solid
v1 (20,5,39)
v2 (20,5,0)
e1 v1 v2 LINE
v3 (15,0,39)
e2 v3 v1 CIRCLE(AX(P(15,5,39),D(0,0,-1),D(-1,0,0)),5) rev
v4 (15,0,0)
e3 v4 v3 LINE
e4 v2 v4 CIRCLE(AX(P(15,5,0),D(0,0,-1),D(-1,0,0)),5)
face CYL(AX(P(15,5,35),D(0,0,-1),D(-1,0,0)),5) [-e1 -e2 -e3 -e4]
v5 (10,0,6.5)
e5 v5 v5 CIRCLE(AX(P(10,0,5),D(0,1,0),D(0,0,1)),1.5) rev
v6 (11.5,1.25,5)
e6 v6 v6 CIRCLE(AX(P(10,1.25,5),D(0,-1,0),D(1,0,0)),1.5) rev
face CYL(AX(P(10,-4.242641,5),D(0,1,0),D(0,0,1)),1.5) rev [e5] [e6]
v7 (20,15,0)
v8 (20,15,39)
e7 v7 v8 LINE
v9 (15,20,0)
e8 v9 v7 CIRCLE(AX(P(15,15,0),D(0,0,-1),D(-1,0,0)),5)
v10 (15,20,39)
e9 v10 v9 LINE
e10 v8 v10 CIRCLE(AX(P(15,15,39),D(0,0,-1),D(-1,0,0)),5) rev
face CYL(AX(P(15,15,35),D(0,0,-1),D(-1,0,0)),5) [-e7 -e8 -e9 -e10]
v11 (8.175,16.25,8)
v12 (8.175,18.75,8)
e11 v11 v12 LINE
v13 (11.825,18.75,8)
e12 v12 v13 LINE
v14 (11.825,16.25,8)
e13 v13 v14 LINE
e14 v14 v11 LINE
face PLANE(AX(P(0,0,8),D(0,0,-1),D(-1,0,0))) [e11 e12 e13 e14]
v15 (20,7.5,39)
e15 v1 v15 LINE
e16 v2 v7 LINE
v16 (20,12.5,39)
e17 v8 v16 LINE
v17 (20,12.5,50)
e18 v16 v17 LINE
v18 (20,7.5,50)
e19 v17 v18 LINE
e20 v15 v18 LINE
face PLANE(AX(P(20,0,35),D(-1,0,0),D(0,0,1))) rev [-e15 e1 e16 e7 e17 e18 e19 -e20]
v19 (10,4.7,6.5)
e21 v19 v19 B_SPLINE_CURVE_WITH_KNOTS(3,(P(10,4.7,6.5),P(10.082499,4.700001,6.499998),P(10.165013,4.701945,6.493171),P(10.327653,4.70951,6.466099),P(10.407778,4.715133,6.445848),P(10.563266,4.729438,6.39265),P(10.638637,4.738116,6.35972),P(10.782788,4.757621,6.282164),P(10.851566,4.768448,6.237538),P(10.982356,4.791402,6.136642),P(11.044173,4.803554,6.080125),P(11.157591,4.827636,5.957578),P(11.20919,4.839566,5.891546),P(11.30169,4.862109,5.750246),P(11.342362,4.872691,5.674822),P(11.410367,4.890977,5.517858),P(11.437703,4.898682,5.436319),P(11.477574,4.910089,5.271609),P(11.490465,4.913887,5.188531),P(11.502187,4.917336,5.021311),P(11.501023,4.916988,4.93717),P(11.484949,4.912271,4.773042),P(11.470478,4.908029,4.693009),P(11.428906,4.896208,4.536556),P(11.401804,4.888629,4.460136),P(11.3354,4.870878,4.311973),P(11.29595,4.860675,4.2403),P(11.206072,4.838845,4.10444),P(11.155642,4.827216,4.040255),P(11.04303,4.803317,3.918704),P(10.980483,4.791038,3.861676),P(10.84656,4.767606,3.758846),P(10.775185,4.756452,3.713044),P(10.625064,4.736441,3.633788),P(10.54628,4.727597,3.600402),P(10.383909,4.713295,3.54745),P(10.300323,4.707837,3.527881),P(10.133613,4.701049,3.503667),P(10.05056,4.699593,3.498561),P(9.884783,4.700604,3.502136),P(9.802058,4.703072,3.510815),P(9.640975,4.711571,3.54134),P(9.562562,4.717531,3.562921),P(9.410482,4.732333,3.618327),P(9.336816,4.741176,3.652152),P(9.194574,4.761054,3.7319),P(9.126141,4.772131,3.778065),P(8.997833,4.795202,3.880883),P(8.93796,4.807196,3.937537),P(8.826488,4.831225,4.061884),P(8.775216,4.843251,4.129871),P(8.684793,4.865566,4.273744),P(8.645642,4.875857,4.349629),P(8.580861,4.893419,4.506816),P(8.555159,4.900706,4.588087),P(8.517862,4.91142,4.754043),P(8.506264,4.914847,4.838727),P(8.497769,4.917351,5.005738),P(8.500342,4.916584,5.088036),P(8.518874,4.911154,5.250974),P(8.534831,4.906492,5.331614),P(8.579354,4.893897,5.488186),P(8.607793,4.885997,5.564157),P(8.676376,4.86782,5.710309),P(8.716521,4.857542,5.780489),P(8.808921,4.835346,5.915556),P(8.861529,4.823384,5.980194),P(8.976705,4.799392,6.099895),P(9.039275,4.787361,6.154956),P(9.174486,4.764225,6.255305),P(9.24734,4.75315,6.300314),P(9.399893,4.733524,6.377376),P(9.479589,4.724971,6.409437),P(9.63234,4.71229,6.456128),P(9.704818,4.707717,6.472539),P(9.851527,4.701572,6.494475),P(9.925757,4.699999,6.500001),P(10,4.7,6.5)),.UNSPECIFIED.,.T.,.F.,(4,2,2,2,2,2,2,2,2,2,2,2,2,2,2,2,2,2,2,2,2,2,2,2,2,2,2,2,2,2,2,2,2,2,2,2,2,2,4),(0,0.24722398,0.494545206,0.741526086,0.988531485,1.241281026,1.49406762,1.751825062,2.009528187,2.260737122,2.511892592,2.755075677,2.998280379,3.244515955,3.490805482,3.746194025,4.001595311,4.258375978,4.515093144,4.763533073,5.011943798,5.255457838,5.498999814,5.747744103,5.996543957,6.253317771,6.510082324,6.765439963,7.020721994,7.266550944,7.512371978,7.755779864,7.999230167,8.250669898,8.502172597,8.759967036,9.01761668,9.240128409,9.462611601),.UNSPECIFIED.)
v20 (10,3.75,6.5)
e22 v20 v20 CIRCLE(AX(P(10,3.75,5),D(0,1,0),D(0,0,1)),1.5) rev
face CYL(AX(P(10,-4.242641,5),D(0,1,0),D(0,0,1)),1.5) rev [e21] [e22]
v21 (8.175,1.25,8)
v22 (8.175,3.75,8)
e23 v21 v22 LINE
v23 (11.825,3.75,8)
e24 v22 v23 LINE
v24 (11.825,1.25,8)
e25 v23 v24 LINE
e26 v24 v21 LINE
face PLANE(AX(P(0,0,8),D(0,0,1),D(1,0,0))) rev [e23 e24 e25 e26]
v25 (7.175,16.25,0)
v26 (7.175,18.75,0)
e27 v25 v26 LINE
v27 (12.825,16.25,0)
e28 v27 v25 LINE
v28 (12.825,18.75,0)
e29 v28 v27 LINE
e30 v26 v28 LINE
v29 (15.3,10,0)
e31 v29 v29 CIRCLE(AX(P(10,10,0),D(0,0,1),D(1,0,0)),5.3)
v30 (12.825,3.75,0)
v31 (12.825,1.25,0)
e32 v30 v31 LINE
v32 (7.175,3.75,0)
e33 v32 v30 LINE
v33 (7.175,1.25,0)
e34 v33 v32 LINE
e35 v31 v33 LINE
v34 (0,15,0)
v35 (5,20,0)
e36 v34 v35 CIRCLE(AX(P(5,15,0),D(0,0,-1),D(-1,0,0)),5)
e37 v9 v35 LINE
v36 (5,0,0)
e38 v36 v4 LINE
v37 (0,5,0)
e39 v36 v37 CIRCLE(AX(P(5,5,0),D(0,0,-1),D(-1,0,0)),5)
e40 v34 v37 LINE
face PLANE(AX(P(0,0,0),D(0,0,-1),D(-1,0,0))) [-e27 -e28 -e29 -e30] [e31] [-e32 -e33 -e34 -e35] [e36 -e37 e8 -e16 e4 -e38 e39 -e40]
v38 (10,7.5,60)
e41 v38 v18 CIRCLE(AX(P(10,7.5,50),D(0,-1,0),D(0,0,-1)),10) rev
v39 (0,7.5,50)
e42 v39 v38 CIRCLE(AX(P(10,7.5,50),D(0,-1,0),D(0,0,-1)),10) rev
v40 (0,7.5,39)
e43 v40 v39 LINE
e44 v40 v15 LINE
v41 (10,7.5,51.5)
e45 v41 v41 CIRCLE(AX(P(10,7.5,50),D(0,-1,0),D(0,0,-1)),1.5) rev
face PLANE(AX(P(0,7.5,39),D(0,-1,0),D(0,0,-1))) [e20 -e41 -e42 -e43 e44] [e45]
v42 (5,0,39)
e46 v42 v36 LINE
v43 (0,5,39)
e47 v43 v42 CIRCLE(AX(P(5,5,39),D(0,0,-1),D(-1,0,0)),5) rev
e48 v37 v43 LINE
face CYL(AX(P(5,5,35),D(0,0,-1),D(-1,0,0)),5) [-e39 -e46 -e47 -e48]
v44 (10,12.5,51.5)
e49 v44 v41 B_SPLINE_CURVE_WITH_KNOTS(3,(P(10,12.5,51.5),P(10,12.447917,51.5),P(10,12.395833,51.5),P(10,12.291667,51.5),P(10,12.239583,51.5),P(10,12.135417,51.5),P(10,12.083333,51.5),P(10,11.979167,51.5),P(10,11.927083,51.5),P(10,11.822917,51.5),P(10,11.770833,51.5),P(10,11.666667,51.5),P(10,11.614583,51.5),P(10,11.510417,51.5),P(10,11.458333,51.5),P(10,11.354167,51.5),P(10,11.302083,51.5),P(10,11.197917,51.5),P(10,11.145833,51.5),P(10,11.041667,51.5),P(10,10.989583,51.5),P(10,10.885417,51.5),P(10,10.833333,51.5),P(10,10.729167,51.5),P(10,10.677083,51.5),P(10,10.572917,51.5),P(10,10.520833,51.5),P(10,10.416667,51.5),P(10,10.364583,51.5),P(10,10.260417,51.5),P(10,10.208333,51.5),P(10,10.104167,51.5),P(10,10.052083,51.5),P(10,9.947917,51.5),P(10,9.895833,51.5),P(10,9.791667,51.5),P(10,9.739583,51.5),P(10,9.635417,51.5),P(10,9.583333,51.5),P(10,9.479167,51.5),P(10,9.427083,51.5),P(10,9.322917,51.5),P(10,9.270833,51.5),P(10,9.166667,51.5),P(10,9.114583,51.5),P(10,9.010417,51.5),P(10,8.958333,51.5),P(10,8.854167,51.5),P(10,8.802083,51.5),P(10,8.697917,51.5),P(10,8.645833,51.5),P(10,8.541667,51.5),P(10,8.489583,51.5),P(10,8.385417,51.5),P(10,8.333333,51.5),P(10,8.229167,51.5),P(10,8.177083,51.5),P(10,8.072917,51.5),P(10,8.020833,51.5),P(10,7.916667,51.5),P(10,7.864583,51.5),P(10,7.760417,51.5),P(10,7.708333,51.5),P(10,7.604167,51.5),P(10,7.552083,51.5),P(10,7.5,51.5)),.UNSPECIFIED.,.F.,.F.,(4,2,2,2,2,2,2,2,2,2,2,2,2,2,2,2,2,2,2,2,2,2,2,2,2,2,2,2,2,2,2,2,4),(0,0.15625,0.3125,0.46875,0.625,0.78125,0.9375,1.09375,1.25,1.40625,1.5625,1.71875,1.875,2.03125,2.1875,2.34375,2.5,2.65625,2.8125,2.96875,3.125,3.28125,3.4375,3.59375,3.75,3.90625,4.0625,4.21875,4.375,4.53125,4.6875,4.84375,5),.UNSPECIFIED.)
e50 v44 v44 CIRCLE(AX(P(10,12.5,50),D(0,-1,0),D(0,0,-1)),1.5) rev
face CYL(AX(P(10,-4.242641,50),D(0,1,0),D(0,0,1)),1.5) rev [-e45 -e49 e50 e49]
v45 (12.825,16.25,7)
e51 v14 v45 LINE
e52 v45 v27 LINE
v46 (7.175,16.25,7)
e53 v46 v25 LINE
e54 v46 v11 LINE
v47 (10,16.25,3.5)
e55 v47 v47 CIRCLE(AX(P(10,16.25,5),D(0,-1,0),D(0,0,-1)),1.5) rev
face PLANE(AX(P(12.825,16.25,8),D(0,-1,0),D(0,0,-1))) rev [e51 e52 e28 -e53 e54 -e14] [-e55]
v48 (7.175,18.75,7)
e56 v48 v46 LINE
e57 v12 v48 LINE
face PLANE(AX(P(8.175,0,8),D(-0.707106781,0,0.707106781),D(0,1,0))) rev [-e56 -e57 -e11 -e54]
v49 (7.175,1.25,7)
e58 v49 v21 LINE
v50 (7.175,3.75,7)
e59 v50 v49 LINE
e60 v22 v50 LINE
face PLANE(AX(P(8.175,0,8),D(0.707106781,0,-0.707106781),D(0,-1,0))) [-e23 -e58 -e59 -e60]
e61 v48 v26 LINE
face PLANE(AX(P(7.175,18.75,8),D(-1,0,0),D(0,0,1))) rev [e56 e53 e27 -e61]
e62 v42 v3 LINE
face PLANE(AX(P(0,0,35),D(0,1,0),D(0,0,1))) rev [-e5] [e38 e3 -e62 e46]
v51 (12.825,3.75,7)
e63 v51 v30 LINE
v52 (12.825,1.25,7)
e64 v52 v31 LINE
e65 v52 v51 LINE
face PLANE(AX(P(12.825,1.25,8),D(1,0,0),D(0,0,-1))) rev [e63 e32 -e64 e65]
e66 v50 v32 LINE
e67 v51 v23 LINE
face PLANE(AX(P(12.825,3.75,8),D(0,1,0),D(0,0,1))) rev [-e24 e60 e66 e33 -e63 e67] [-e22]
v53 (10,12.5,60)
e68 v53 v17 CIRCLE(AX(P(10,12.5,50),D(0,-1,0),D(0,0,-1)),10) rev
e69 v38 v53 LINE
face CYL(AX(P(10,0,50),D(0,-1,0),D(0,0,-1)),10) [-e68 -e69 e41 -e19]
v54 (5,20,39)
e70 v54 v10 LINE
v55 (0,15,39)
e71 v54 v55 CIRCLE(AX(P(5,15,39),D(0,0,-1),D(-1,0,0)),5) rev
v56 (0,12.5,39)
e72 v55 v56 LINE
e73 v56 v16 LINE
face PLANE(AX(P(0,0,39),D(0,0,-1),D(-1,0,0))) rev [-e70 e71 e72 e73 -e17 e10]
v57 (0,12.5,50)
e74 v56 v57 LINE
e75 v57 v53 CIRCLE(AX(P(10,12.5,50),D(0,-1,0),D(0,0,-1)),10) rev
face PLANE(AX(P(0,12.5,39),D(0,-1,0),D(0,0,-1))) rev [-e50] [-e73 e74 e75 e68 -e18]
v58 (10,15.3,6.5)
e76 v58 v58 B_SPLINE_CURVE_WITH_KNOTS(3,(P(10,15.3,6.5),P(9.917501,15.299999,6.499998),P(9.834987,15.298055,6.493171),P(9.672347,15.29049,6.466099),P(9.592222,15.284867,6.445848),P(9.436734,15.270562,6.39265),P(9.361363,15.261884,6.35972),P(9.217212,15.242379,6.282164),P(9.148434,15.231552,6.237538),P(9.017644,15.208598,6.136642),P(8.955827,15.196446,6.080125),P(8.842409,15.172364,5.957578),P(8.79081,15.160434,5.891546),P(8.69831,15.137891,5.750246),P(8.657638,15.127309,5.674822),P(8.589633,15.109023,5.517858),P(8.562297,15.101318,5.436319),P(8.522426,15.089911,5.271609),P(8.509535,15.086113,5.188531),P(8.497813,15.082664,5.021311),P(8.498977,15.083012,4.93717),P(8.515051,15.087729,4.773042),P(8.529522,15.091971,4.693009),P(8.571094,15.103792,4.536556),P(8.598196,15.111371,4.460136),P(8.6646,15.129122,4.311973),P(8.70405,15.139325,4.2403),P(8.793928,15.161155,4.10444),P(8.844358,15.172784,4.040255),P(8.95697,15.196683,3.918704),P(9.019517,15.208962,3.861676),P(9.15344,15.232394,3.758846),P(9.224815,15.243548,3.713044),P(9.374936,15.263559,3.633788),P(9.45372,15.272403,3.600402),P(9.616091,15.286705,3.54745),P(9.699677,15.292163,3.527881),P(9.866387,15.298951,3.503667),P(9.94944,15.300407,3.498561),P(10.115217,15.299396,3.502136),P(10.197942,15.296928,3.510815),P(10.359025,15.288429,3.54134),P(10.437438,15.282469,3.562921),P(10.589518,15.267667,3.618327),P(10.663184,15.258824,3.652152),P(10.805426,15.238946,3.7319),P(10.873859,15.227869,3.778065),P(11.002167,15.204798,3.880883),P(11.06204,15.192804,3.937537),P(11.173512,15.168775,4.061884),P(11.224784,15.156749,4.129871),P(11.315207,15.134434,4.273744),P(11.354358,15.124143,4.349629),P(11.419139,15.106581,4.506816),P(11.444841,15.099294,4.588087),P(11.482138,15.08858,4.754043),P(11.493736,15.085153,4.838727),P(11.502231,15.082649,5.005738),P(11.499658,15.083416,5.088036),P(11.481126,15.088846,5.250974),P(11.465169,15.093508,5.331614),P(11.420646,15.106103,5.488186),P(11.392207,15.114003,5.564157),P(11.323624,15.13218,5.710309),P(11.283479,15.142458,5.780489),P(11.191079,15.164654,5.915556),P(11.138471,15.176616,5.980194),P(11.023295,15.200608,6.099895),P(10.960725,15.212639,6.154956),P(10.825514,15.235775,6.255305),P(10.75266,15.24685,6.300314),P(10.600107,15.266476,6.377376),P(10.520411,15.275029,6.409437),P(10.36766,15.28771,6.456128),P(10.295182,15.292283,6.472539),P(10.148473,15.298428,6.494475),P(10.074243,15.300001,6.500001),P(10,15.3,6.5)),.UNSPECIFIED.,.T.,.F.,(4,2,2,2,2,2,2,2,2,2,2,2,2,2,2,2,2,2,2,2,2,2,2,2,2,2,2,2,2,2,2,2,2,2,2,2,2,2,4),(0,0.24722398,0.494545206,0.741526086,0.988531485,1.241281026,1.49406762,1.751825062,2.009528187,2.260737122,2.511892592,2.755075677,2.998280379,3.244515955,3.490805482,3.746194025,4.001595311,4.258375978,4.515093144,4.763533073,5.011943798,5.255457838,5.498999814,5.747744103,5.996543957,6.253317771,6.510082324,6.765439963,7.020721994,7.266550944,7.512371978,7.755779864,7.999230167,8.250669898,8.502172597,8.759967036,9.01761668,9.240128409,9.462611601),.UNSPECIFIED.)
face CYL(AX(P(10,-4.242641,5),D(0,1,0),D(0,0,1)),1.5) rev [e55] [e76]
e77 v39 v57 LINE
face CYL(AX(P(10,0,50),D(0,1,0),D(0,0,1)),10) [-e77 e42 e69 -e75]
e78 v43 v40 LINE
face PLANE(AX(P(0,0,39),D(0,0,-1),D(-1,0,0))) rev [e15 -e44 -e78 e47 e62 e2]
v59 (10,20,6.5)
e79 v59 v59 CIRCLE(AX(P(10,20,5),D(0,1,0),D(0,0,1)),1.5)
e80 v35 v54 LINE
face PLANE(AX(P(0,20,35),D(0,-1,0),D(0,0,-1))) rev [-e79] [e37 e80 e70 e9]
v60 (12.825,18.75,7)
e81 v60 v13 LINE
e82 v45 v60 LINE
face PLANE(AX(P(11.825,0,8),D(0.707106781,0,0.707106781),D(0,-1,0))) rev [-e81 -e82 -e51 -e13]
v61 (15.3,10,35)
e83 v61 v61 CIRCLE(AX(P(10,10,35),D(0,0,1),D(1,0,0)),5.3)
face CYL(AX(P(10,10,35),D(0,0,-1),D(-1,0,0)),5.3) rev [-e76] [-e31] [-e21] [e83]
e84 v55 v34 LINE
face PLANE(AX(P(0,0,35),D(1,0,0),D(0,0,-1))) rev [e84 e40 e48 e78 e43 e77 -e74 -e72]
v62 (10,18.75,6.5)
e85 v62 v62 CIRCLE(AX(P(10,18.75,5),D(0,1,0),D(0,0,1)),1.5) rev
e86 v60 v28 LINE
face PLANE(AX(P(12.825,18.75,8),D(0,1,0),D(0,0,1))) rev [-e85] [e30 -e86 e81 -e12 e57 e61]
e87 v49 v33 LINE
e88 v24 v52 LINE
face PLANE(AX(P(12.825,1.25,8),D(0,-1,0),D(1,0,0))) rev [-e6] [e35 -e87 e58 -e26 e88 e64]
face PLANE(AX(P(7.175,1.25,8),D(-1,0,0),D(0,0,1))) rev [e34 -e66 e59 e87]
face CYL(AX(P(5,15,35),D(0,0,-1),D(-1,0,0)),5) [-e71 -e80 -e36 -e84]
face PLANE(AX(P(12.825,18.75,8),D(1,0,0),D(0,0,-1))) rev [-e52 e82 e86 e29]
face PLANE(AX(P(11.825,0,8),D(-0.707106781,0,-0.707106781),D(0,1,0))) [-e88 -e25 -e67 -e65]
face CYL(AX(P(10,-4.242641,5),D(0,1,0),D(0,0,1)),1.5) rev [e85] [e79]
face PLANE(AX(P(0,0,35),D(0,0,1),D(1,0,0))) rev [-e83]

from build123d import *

# Parameters (mm, degrees)
SKETCH1_W           = 20
SKETCH1_H           = 20
SKETCH1_R           = 5.3
BOSS_EXTRUDE1_DEPTH = 35
SKETCH2_W           = 20
SKETCH2_H           = 20
BOSS_EXTRUDE2_DEPTH = 25
CUT_EXTRUDE2_REACH  = 68.332
SKETCH5_R           = 1.5
FILLET2_R           = 10
SKETCH4_W           = 20
SKETCH4_H           = 7.5
CUT_EXTRUDE3_DEPTH  = 21
FILLET3_R           = 5
SKETCH6_W           = 5.65
SKETCH6_H           = 2.5
CUT_EXTRUDE4_DEPTH  = 8
CHAMFER1_SIZE       = 1


with BuildPart() as part:
    # Sketch1 → Boss-Extrude1 (new body)
    with BuildSketch(Plane.XY):
        with Locations((10, 10)):
            Rectangle(SKETCH1_W, SKETCH1_H)
        with Locations((10, 10)):
            Circle(SKETCH1_R, mode=Mode.SUBTRACT)
    extrude(amount=BOSS_EXTRUDE1_DEPTH)

    # Sketch2 → Boss-Extrude2 (add)
    with BuildSketch(Plane.XY.offset(35)):
        with Locations((10, 10)):
            Rectangle(SKETCH2_W, SKETCH2_H)
    extrude(amount=BOSS_EXTRUDE2_DEPTH)

    # Cut-Extrude2: up to this face of the body (flat: up to its plane)
    cut_extrude2_end = Plane(part.part.faces().sort_by_distance((10, 0, 30))[0])
    # Sketch5 → Cut-Extrude2 (cut, up to the picked face)
    with BuildSketch(Plane(origin=(0, 20, 0), x_dir=(1, 0, 0), z_dir=(0, 1, 0)), mode=Mode.PRIVATE) as cut_extrude2_sk1:
        with Locations(Location((10, -5, 0), (0, 0, 270))):
            Circle(SKETCH5_R)
    cut_extrude2_tool1 = split(extrude(cut_extrude2_sk1.sketch, amount=-CUT_EXTRUDE2_REACH, mode=Mode.PRIVATE), bisect_by=cut_extrude2_end, keep=Keep.BOTH, mode=Mode.PRIVATE)
    # Sketch5 → Cut-Extrude2 (cut, up to the picked face)
    with BuildSketch(Plane(origin=(0, 20, 0), x_dir=(1, 0, 0), z_dir=(0, 1, 0)), mode=Mode.PRIVATE) as cut_extrude2_sk2:
        with Locations(Location((10, -50, 0), (0, 0, 270))):
            Circle(SKETCH5_R)
    cut_extrude2_tool2 = split(extrude(cut_extrude2_sk2.sketch, amount=-CUT_EXTRUDE2_REACH, mode=Mode.PRIVATE), bisect_by=cut_extrude2_end, keep=Keep.BOTH, mode=Mode.PRIVATE)
    add(cut_extrude2_tool1.solids().sort_by(Axis((10, 20, 5), (0, -1, 0)))[0], mode=Mode.SUBTRACT)
    add(cut_extrude2_tool2.solids().sort_by(Axis((10, 20, 50), (0, -1, 0)))[0], mode=Mode.SUBTRACT)

    # Fillet2
    fillet2_edges = [part.edges().sort_by_distance(p)[0] for p in [
        (0, 10, 60),
        (20, 10, 60),
    ]]
    fillet(fillet2_edges, radius=FILLET2_R - 0.0001)  # a hair under: the kernel refuses the full size

    # Sketch4 → Cut-Extrude3 (cut)
    with BuildSketch(Plane.XY.offset(60)):
        with Locations((10, 3.75)):
            Rectangle(SKETCH4_W, SKETCH4_H)
        with Locations((10, 16.25)):
            Rectangle(SKETCH4_W, SKETCH4_H)
    extrude(amount=-CUT_EXTRUDE3_DEPTH, mode=Mode.SUBTRACT)

    # Fillet3
    fillet3_edges = [part.edges().sort_by_distance(p)[0] for p in [
        (0, 20, 19.5),
        (20, 20, 19.5),
        (20, 0, 19.5),
        (0, 0, 19.5),
    ]]
    fillet(fillet3_edges, radius=FILLET3_R)

    # Sketch6 → Cut-Extrude4 (cut)
    with BuildSketch(Plane(origin=(0, 0, 0), x_dir=(-1, 0, 0), z_dir=(0, 0, -1))):
        with Locations((-10, 17.5)):
            Rectangle(SKETCH6_W, SKETCH6_H)
        with Locations((-10, 2.5)):
            Rectangle(SKETCH6_W, SKETCH6_H)
    extrude(amount=-CUT_EXTRUDE4_DEPTH, mode=Mode.SUBTRACT)

    # Chamfer1
    chamfer1_edges = [part.edges().sort_by_distance(p)[0] for p in [
        (12.825, 17.5, 8),
        (7.175, 17.5, 8),
        (12.825, 2.5, 8),
        (7.175, 2.5, 8),
    ]]
    chamfer(chamfer1_edges, length=CHAMFER1_SIZE)


solid = part.part
